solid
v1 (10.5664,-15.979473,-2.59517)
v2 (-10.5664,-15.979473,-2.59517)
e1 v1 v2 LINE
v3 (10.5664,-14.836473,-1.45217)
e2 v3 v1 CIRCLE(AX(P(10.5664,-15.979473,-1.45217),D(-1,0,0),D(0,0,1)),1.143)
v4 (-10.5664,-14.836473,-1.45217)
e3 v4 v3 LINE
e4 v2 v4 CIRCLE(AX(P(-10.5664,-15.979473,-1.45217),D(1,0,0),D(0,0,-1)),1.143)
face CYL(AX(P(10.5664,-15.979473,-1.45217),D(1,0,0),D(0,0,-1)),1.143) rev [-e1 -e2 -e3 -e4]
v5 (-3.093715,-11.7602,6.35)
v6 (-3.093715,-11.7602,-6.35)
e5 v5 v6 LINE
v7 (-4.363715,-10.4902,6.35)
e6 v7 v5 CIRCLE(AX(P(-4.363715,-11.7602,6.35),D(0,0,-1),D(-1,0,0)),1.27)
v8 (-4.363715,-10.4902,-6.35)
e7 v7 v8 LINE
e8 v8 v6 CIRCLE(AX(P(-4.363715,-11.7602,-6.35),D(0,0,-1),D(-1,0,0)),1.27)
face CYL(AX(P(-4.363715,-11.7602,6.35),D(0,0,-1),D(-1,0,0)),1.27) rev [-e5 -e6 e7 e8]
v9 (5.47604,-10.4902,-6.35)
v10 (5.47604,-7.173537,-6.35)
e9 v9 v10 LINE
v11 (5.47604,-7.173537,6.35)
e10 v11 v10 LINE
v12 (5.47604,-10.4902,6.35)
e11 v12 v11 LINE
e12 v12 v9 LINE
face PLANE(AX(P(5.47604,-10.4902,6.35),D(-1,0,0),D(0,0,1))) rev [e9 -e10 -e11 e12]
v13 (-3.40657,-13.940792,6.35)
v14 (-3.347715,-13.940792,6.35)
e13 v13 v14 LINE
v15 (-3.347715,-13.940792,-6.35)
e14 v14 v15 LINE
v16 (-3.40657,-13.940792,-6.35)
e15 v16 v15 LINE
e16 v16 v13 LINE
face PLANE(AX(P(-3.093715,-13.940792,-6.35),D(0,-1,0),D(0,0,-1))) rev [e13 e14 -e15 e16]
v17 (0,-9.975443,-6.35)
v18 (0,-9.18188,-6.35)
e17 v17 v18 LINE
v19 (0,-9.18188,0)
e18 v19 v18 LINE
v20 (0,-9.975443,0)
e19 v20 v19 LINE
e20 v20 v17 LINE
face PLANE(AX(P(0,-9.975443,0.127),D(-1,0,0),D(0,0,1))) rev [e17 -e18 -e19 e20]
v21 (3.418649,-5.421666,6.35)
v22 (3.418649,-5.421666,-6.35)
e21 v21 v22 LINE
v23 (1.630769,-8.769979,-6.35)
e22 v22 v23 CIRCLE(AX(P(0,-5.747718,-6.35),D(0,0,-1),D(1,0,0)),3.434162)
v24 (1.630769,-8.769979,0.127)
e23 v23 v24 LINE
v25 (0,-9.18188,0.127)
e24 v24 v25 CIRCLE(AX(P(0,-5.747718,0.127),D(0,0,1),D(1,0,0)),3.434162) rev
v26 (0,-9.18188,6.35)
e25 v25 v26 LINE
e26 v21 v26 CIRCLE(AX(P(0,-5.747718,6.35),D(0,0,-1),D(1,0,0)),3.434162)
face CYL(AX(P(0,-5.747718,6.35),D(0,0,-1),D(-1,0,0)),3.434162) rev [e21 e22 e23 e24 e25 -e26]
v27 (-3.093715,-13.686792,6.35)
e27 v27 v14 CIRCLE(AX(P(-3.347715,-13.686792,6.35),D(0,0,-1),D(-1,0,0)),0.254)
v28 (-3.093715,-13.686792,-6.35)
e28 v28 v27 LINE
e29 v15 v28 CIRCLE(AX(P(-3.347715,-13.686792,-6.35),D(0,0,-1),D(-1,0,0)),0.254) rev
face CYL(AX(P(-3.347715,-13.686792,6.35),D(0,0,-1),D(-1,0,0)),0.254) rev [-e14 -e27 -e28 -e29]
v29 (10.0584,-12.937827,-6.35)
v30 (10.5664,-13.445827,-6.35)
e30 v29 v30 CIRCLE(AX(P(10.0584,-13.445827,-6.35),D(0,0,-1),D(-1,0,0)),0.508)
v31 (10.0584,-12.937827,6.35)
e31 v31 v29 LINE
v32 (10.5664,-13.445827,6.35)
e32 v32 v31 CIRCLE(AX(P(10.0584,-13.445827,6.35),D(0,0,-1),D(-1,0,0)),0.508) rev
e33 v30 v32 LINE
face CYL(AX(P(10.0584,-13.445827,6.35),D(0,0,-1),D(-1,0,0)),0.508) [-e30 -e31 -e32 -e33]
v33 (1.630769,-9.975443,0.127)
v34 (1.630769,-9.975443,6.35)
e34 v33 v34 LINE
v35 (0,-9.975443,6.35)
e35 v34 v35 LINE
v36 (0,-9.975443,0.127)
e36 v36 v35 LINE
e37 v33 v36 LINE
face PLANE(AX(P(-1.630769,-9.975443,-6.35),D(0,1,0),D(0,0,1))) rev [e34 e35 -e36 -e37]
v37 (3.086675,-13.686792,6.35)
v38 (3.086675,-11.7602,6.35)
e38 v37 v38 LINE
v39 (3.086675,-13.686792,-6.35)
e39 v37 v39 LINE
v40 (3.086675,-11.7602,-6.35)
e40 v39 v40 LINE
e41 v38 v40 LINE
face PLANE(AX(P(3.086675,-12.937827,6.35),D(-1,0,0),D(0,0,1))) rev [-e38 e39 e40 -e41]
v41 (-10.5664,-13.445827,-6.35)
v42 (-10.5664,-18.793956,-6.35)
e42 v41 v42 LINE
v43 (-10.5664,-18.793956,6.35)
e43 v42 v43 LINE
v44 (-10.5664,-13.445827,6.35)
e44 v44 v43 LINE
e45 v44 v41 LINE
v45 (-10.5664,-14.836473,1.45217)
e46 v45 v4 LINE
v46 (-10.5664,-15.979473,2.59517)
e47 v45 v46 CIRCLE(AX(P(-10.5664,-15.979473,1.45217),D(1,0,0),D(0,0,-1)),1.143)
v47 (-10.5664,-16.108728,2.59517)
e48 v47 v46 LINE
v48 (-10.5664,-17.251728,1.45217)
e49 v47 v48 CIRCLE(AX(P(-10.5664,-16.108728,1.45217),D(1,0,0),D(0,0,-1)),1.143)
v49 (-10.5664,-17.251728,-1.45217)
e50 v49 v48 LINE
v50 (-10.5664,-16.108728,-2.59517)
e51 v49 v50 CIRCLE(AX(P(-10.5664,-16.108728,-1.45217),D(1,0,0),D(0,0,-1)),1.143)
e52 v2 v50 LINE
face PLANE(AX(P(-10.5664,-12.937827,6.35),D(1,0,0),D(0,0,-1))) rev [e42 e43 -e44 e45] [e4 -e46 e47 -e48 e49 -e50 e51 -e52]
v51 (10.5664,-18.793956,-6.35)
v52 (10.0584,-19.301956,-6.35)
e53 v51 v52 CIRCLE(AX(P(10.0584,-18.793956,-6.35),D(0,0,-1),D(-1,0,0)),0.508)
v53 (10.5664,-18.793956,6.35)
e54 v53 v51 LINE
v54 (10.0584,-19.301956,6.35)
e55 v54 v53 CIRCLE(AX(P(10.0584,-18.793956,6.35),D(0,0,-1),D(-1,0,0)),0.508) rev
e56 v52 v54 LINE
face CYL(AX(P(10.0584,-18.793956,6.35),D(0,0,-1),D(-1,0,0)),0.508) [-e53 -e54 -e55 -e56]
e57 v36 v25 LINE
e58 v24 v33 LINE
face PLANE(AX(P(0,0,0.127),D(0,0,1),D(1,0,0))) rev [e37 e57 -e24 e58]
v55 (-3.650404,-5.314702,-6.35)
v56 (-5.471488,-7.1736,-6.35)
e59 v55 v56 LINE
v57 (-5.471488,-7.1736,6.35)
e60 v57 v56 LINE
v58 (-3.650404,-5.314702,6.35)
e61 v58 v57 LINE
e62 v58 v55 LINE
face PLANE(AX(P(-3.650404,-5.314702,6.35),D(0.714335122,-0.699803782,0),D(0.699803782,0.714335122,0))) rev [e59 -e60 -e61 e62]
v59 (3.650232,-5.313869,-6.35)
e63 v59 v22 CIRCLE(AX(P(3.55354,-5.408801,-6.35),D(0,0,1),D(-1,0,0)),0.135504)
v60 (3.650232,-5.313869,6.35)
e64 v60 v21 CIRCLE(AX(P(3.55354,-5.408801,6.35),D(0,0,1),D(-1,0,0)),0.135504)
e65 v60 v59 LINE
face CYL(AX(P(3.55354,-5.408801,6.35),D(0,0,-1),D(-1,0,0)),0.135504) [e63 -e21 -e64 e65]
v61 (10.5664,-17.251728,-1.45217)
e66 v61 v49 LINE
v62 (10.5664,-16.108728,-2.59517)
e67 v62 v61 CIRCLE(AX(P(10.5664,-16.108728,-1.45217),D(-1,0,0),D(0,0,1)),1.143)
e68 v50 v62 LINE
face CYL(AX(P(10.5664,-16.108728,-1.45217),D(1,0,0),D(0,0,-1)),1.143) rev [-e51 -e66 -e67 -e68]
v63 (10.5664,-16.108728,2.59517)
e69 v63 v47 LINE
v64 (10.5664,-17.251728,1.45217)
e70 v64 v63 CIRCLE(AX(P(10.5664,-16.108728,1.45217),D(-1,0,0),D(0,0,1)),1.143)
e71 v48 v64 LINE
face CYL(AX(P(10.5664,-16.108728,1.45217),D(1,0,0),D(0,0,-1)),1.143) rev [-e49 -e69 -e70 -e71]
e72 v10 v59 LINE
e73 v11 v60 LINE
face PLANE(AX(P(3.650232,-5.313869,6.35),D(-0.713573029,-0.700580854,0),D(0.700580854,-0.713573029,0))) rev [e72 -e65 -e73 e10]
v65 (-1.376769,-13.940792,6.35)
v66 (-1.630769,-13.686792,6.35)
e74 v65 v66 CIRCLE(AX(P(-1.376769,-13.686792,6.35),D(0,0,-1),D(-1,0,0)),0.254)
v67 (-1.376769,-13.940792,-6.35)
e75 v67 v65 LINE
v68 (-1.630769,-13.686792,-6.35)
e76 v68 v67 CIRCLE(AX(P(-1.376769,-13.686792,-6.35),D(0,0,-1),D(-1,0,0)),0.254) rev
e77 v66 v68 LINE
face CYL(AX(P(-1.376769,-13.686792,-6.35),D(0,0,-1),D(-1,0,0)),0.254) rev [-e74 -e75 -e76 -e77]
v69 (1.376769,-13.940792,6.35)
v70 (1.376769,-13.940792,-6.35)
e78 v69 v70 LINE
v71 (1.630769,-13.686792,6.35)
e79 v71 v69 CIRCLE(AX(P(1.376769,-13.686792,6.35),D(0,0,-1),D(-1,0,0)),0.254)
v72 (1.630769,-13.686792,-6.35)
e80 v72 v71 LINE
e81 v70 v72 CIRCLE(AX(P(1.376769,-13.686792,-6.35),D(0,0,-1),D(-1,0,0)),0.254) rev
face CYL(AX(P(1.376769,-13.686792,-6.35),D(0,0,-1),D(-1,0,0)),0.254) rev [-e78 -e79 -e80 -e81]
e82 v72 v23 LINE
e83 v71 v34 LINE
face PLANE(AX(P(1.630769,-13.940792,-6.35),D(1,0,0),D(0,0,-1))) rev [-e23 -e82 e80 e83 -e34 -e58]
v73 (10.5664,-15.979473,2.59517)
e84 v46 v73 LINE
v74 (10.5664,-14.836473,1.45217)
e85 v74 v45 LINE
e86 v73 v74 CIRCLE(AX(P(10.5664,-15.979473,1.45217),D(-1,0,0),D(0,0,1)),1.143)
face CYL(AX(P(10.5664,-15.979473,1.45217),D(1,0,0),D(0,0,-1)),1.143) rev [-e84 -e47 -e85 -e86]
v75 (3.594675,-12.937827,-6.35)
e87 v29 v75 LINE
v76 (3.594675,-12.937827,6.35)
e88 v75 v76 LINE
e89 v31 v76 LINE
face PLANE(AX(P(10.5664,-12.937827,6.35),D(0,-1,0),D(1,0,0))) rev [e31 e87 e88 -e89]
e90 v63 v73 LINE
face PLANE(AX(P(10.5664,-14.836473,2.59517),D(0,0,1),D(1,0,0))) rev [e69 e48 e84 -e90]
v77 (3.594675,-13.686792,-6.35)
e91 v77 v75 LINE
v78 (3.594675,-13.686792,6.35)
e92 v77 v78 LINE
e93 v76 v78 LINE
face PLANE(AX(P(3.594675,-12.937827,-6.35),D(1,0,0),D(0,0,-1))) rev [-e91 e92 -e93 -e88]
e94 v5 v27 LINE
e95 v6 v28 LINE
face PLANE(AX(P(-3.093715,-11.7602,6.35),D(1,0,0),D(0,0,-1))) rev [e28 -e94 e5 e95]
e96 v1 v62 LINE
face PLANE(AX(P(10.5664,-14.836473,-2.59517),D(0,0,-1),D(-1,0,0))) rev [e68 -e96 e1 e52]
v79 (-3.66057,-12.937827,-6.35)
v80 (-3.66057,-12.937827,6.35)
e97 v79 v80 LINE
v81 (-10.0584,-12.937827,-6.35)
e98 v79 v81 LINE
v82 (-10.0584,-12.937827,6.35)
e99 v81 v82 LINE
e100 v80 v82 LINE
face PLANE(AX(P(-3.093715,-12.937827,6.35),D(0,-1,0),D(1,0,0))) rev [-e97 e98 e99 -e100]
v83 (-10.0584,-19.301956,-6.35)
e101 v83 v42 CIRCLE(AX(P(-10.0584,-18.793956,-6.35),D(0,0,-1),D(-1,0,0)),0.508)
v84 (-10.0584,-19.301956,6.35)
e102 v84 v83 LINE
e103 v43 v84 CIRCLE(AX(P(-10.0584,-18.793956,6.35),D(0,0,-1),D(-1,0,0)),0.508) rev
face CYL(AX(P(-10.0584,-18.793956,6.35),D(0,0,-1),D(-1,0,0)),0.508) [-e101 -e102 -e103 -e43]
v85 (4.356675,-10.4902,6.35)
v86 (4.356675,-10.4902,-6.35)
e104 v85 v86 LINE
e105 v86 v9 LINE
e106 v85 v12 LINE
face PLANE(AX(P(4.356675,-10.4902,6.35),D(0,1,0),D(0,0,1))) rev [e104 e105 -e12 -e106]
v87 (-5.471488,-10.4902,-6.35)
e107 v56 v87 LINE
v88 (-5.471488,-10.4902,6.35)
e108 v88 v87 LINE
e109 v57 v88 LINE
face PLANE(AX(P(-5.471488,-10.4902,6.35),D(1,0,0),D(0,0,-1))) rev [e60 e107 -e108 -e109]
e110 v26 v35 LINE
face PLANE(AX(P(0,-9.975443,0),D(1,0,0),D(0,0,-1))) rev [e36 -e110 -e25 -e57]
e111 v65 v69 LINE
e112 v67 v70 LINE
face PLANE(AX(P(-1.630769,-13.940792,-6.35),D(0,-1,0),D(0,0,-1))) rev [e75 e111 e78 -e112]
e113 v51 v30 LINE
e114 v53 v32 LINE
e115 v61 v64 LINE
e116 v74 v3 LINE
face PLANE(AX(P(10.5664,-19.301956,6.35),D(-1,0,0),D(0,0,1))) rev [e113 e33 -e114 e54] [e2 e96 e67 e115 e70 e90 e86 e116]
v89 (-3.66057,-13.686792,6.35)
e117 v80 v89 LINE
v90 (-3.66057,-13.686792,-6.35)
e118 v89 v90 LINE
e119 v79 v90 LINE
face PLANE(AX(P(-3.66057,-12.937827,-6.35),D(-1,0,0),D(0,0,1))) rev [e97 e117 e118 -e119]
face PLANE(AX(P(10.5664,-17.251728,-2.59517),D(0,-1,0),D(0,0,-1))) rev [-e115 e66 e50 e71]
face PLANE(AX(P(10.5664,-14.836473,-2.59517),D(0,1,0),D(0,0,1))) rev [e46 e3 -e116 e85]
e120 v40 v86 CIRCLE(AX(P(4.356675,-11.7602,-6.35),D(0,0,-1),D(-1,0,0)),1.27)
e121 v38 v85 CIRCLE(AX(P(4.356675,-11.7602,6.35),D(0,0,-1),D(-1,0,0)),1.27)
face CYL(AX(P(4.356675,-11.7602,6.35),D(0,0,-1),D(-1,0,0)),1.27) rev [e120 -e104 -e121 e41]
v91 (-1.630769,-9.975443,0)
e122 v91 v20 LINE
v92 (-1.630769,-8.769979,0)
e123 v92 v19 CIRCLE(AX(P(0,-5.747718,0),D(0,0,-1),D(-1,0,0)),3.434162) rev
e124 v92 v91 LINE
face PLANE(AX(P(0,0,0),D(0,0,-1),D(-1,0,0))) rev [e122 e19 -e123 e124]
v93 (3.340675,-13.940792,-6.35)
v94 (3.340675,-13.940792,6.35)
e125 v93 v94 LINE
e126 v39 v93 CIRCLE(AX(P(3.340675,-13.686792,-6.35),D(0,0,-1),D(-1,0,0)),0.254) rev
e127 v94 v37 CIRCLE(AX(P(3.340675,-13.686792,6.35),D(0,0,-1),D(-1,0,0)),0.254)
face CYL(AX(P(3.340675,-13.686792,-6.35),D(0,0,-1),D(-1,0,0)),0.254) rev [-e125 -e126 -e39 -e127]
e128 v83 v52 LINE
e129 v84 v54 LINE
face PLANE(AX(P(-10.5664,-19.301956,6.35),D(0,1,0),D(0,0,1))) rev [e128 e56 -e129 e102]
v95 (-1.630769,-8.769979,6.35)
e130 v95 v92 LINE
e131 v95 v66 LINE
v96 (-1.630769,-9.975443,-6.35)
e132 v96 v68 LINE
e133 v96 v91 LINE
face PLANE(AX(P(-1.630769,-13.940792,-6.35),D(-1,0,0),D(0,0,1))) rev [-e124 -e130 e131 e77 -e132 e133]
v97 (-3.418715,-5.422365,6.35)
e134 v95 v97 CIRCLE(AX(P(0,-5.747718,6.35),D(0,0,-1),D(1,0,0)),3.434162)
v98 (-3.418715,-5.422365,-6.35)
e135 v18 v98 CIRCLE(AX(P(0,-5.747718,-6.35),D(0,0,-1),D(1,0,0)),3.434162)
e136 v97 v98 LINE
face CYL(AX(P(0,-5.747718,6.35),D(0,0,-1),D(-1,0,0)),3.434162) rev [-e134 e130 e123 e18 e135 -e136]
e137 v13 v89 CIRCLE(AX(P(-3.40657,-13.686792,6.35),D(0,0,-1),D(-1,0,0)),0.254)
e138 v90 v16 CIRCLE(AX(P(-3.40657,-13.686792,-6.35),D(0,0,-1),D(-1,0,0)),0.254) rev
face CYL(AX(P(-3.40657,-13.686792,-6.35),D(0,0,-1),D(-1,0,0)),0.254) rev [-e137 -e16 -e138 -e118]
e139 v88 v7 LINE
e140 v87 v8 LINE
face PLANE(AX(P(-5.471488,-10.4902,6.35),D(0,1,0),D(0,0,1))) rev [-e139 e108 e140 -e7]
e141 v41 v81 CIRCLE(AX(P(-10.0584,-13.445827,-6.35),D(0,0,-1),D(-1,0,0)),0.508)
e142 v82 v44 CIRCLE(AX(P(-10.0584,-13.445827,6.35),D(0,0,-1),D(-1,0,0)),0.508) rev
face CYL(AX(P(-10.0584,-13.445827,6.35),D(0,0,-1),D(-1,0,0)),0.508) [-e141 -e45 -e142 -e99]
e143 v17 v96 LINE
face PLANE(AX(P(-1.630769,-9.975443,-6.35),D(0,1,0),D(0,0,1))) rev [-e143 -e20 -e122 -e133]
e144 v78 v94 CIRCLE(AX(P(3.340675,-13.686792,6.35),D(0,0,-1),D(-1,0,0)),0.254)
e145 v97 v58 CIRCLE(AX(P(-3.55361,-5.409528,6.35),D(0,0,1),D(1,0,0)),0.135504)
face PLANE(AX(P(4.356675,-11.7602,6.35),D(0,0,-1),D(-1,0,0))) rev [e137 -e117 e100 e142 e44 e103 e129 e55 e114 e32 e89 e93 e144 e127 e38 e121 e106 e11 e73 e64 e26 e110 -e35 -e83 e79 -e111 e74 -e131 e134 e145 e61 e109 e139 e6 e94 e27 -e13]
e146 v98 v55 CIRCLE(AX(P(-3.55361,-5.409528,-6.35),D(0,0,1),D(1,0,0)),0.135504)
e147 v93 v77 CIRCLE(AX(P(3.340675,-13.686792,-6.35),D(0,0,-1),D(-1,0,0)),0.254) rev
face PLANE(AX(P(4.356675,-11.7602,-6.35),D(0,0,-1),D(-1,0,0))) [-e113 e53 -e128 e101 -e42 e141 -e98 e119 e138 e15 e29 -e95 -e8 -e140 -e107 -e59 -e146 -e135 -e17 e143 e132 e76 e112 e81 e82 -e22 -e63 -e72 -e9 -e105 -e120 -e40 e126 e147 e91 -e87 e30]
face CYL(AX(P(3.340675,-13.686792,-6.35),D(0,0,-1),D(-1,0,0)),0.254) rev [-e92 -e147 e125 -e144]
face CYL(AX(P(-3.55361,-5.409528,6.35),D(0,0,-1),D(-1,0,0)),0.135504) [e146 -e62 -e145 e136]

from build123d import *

# Parameters (mm, degrees)
BOSS_EXTRUDE9_DEPTH      = 6.35
SKETCH4_W                = 3.261538064
SKETCH4_H                = 3.965348827
CUT_EXTRUDE2_DEPTH       = 26.406776986
SKETCH5_W                = 1.630769032
SKETCH5_H                = 1.267236454
CUT_EXTRUDE6_DEPTH       = 6.35
SKETCH6_W                = 1.630769032
SKETCH6_H                = 1.247570224
CUT_EXTRUDE7_DEPTH       = 6.477
CUT_EXTRUDE9_DEPTH       = 23.902768758
CUT_EXTRUDE9_DEPTH_BACK  = 23.902768758
SKETCH8_W                = 0.566855721
SKETCH8_H                = 1.002964872
CUT_EXTRUDE10_DEPTH      = 26.406776986
CUT_EXTRUDE10_DEPTH_BACK = 26.406776986
SKETCH9_W                = 0.508
SKETCH9_H                = 1.002964872
FILLET1_R                = 0.254
FILLET2_R                = 0.254
FILLET3_R                = 0.254
FILLET4_R                = 0.508
FILLET5_R                = 0.508
SKETCH11_W               = 5.19034067
SKETCH11_H               = 2.415254944
CUT_EXTRUDE11_DEPTH      = 30.316944626
FILLET6_R                = 1.143


with BuildPart() as part:
    # Sketch2 → Boss-Extrude9 (new, symmetric)
    with BuildSketch(Plane.XY):
        with BuildLine():
            Line((-5.471488307, -10.4902), (-4.36371454, -10.4902))
            ThreePointArc((-4.36371454, -10.4902), (-3.465688928, -10.862174388), (-3.09371454, -11.7602))
            Line((-3.09371454, -11.7602), (-3.09371454, -12.937827191))
            Line((-3.09371454, -12.937827191), (-10.566399977, -12.937827191))
            Line((-10.566399977, -12.937827191), (-10.566399977, -19.301956075))
            Line((-10.566399977, -19.301956075), (10.566399977, -19.301956075))
            Line((10.566399977, -19.301956075), (10.566399977, -12.937827191))
            Line((10.566399977, -12.937827191), (3.086674887, -12.937827191))
            Line((3.086674887, -12.937827191), (3.086674887, -11.7602))
            ThreePointArc((3.086674887, -11.7602), (3.458649275, -10.862174388), (4.356674887, -10.4902))
            Line((4.356674887, -10.4902), (5.476039751, -10.4902))
            Line((5.476039751, -10.4902), (5.476039751, -7.173536635))
            Line((5.476039751, -7.173536635), (3.650231899, -5.31386943))
            ThreePointArc((3.650231899, -5.31386943), (3.496357897, -5.285953607), (3.418648834, -5.421665813))
            ThreePointArc((3.418648834, -5.421665813), (0.00035136, -9.18188013), (-3.418715481, -5.422365367))
            ThreePointArc((-3.418715481, -5.422365367), (-3.496506609, -5.286643819), (-3.650404442, -5.314701882))
            Line((-3.650404442, -5.314701882), (-5.471488307, -7.173600332))
            Line((-5.471488307, -7.173600332), (-5.471488307, -10.4902))
        make_face()
    extrude(amount=BOSS_EXTRUDE9_DEPTH, both=True)

    # Sketch4 → Cut-Extrude2 (cut, through all)
    with BuildSketch(Plane.XY.offset(6.35)):
        with Locations((0, -11.95811765)):
            Rectangle(SKETCH4_W, SKETCH4_H)
    extrude(amount=-CUT_EXTRUDE2_DEPTH, mode=Mode.SUBTRACT)

    # Sketch5 → Cut-Extrude6 (cut, symmetric)
    with BuildSketch(Plane.XY.offset(6.35)):
        with Locations((-0.815384516, -9.341825009)):
            Rectangle(SKETCH5_W, SKETCH5_H)
    extrude(amount=CUT_EXTRUDE6_DEPTH, both=True, mode=Mode.SUBTRACT)

    # Sketch6 → Cut-Extrude7 (cut, symmetric)
    with BuildSketch(Plane(origin=(0, 0, -6.35), x_dir=(-1, 0, 0), z_dir=(0, 0, -1))):
        with Locations((-0.815384516, -9.351658124)):
            Rectangle(SKETCH6_W, SKETCH6_H)
    extrude(amount=CUT_EXTRUDE7_DEPTH, both=True, mode=Mode.SUBTRACT)

    # Sketch8 → Cut-Extrude9 (cut, two sides: drawn at the far end of the back side and taken through both)
    with BuildSketch(Plane.XY.offset(-CUT_EXTRUDE9_DEPTH_BACK)):
        with Locations((-3.377142401, -13.439309627)):
            Rectangle(SKETCH8_W, SKETCH8_H)
    extrude(amount=CUT_EXTRUDE9_DEPTH + CUT_EXTRUDE9_DEPTH_BACK, mode=Mode.SUBTRACT)

    # Sketch9 → Cut-Extrude10 (cut, two sides: drawn at the far end of the back side and taken through both)
    with BuildSketch(Plane.XY.offset(6.35).offset(-CUT_EXTRUDE10_DEPTH_BACK)):
        with Locations((3.340674887, -13.439309627)):
            Rectangle(SKETCH9_W, SKETCH9_H)
    extrude(amount=CUT_EXTRUDE10_DEPTH + CUT_EXTRUDE10_DEPTH_BACK, mode=Mode.SUBTRACT)

    # Fillet1
    fillet1_edges = [part.edges().sort_by_distance(p)[0] for p in [
        (-3.09371454, -13.940792063, 0),
    ]]
    fillet(fillet1_edges, radius=FILLET1_R)

    # Fillet2
    fillet2_edges = [part.edges().sort_by_distance(p)[0] for p in [
        (-3.660570261, -13.940792063, 0),
    ]]
    fillet(fillet2_edges, radius=FILLET2_R)

    # Fillet3
    fillet3_edges = [part.edges().sort_by_distance(p)[0] for p in [
        (3.594674887, -13.940792063, 0),
        (3.086674887, -13.940792063, 0),
        (1.630769032, -13.940792063, 0),
        (-1.630769032, -13.940792063, 0),
    ]]
    fillet(fillet3_edges, radius=FILLET3_R - 0.0001)  # a hair under: the kernel refuses the full size

    # Fillet4
    fillet4_edges = [part.edges().sort_by_distance(p)[0] for p in [
        (-10.566399977, -12.937827191, 0),
    ]]
    fillet(fillet4_edges, radius=FILLET4_R)

    # Fillet5
    fillet5_edges = [part.edges().sort_by_distance(p)[0] for p in [
        (-10.566399977, -19.301956075, 0),
        (10.566399977, -12.937827191, 0),
        (10.566399977, -19.301956075, 0),
    ]]
    fillet(fillet5_edges, radius=FILLET5_R)

    # Sketch11 → Cut-Extrude11 (cut, through all)
    with BuildSketch(Plane.ZY.offset(10.566399977)):
        with Locations((0, -16.044100378)):
            Rectangle(SKETCH11_W, SKETCH11_H)
    extrude(amount=-CUT_EXTRUDE11_DEPTH, mode=Mode.SUBTRACT)

    # Fillet6
    fillet6_edges = [part.edges().sort_by_distance(p)[0] for p in [
        (0, -14.836472906, 2.595170335),
        (0, -17.25172785, 2.595170335),
        (0, -17.25172785, -2.595170335),
        (0, -14.836472906, -2.595170335),
    ]]
    fillet(fillet6_edges, radius=FILLET6_R)


solid = part.part
